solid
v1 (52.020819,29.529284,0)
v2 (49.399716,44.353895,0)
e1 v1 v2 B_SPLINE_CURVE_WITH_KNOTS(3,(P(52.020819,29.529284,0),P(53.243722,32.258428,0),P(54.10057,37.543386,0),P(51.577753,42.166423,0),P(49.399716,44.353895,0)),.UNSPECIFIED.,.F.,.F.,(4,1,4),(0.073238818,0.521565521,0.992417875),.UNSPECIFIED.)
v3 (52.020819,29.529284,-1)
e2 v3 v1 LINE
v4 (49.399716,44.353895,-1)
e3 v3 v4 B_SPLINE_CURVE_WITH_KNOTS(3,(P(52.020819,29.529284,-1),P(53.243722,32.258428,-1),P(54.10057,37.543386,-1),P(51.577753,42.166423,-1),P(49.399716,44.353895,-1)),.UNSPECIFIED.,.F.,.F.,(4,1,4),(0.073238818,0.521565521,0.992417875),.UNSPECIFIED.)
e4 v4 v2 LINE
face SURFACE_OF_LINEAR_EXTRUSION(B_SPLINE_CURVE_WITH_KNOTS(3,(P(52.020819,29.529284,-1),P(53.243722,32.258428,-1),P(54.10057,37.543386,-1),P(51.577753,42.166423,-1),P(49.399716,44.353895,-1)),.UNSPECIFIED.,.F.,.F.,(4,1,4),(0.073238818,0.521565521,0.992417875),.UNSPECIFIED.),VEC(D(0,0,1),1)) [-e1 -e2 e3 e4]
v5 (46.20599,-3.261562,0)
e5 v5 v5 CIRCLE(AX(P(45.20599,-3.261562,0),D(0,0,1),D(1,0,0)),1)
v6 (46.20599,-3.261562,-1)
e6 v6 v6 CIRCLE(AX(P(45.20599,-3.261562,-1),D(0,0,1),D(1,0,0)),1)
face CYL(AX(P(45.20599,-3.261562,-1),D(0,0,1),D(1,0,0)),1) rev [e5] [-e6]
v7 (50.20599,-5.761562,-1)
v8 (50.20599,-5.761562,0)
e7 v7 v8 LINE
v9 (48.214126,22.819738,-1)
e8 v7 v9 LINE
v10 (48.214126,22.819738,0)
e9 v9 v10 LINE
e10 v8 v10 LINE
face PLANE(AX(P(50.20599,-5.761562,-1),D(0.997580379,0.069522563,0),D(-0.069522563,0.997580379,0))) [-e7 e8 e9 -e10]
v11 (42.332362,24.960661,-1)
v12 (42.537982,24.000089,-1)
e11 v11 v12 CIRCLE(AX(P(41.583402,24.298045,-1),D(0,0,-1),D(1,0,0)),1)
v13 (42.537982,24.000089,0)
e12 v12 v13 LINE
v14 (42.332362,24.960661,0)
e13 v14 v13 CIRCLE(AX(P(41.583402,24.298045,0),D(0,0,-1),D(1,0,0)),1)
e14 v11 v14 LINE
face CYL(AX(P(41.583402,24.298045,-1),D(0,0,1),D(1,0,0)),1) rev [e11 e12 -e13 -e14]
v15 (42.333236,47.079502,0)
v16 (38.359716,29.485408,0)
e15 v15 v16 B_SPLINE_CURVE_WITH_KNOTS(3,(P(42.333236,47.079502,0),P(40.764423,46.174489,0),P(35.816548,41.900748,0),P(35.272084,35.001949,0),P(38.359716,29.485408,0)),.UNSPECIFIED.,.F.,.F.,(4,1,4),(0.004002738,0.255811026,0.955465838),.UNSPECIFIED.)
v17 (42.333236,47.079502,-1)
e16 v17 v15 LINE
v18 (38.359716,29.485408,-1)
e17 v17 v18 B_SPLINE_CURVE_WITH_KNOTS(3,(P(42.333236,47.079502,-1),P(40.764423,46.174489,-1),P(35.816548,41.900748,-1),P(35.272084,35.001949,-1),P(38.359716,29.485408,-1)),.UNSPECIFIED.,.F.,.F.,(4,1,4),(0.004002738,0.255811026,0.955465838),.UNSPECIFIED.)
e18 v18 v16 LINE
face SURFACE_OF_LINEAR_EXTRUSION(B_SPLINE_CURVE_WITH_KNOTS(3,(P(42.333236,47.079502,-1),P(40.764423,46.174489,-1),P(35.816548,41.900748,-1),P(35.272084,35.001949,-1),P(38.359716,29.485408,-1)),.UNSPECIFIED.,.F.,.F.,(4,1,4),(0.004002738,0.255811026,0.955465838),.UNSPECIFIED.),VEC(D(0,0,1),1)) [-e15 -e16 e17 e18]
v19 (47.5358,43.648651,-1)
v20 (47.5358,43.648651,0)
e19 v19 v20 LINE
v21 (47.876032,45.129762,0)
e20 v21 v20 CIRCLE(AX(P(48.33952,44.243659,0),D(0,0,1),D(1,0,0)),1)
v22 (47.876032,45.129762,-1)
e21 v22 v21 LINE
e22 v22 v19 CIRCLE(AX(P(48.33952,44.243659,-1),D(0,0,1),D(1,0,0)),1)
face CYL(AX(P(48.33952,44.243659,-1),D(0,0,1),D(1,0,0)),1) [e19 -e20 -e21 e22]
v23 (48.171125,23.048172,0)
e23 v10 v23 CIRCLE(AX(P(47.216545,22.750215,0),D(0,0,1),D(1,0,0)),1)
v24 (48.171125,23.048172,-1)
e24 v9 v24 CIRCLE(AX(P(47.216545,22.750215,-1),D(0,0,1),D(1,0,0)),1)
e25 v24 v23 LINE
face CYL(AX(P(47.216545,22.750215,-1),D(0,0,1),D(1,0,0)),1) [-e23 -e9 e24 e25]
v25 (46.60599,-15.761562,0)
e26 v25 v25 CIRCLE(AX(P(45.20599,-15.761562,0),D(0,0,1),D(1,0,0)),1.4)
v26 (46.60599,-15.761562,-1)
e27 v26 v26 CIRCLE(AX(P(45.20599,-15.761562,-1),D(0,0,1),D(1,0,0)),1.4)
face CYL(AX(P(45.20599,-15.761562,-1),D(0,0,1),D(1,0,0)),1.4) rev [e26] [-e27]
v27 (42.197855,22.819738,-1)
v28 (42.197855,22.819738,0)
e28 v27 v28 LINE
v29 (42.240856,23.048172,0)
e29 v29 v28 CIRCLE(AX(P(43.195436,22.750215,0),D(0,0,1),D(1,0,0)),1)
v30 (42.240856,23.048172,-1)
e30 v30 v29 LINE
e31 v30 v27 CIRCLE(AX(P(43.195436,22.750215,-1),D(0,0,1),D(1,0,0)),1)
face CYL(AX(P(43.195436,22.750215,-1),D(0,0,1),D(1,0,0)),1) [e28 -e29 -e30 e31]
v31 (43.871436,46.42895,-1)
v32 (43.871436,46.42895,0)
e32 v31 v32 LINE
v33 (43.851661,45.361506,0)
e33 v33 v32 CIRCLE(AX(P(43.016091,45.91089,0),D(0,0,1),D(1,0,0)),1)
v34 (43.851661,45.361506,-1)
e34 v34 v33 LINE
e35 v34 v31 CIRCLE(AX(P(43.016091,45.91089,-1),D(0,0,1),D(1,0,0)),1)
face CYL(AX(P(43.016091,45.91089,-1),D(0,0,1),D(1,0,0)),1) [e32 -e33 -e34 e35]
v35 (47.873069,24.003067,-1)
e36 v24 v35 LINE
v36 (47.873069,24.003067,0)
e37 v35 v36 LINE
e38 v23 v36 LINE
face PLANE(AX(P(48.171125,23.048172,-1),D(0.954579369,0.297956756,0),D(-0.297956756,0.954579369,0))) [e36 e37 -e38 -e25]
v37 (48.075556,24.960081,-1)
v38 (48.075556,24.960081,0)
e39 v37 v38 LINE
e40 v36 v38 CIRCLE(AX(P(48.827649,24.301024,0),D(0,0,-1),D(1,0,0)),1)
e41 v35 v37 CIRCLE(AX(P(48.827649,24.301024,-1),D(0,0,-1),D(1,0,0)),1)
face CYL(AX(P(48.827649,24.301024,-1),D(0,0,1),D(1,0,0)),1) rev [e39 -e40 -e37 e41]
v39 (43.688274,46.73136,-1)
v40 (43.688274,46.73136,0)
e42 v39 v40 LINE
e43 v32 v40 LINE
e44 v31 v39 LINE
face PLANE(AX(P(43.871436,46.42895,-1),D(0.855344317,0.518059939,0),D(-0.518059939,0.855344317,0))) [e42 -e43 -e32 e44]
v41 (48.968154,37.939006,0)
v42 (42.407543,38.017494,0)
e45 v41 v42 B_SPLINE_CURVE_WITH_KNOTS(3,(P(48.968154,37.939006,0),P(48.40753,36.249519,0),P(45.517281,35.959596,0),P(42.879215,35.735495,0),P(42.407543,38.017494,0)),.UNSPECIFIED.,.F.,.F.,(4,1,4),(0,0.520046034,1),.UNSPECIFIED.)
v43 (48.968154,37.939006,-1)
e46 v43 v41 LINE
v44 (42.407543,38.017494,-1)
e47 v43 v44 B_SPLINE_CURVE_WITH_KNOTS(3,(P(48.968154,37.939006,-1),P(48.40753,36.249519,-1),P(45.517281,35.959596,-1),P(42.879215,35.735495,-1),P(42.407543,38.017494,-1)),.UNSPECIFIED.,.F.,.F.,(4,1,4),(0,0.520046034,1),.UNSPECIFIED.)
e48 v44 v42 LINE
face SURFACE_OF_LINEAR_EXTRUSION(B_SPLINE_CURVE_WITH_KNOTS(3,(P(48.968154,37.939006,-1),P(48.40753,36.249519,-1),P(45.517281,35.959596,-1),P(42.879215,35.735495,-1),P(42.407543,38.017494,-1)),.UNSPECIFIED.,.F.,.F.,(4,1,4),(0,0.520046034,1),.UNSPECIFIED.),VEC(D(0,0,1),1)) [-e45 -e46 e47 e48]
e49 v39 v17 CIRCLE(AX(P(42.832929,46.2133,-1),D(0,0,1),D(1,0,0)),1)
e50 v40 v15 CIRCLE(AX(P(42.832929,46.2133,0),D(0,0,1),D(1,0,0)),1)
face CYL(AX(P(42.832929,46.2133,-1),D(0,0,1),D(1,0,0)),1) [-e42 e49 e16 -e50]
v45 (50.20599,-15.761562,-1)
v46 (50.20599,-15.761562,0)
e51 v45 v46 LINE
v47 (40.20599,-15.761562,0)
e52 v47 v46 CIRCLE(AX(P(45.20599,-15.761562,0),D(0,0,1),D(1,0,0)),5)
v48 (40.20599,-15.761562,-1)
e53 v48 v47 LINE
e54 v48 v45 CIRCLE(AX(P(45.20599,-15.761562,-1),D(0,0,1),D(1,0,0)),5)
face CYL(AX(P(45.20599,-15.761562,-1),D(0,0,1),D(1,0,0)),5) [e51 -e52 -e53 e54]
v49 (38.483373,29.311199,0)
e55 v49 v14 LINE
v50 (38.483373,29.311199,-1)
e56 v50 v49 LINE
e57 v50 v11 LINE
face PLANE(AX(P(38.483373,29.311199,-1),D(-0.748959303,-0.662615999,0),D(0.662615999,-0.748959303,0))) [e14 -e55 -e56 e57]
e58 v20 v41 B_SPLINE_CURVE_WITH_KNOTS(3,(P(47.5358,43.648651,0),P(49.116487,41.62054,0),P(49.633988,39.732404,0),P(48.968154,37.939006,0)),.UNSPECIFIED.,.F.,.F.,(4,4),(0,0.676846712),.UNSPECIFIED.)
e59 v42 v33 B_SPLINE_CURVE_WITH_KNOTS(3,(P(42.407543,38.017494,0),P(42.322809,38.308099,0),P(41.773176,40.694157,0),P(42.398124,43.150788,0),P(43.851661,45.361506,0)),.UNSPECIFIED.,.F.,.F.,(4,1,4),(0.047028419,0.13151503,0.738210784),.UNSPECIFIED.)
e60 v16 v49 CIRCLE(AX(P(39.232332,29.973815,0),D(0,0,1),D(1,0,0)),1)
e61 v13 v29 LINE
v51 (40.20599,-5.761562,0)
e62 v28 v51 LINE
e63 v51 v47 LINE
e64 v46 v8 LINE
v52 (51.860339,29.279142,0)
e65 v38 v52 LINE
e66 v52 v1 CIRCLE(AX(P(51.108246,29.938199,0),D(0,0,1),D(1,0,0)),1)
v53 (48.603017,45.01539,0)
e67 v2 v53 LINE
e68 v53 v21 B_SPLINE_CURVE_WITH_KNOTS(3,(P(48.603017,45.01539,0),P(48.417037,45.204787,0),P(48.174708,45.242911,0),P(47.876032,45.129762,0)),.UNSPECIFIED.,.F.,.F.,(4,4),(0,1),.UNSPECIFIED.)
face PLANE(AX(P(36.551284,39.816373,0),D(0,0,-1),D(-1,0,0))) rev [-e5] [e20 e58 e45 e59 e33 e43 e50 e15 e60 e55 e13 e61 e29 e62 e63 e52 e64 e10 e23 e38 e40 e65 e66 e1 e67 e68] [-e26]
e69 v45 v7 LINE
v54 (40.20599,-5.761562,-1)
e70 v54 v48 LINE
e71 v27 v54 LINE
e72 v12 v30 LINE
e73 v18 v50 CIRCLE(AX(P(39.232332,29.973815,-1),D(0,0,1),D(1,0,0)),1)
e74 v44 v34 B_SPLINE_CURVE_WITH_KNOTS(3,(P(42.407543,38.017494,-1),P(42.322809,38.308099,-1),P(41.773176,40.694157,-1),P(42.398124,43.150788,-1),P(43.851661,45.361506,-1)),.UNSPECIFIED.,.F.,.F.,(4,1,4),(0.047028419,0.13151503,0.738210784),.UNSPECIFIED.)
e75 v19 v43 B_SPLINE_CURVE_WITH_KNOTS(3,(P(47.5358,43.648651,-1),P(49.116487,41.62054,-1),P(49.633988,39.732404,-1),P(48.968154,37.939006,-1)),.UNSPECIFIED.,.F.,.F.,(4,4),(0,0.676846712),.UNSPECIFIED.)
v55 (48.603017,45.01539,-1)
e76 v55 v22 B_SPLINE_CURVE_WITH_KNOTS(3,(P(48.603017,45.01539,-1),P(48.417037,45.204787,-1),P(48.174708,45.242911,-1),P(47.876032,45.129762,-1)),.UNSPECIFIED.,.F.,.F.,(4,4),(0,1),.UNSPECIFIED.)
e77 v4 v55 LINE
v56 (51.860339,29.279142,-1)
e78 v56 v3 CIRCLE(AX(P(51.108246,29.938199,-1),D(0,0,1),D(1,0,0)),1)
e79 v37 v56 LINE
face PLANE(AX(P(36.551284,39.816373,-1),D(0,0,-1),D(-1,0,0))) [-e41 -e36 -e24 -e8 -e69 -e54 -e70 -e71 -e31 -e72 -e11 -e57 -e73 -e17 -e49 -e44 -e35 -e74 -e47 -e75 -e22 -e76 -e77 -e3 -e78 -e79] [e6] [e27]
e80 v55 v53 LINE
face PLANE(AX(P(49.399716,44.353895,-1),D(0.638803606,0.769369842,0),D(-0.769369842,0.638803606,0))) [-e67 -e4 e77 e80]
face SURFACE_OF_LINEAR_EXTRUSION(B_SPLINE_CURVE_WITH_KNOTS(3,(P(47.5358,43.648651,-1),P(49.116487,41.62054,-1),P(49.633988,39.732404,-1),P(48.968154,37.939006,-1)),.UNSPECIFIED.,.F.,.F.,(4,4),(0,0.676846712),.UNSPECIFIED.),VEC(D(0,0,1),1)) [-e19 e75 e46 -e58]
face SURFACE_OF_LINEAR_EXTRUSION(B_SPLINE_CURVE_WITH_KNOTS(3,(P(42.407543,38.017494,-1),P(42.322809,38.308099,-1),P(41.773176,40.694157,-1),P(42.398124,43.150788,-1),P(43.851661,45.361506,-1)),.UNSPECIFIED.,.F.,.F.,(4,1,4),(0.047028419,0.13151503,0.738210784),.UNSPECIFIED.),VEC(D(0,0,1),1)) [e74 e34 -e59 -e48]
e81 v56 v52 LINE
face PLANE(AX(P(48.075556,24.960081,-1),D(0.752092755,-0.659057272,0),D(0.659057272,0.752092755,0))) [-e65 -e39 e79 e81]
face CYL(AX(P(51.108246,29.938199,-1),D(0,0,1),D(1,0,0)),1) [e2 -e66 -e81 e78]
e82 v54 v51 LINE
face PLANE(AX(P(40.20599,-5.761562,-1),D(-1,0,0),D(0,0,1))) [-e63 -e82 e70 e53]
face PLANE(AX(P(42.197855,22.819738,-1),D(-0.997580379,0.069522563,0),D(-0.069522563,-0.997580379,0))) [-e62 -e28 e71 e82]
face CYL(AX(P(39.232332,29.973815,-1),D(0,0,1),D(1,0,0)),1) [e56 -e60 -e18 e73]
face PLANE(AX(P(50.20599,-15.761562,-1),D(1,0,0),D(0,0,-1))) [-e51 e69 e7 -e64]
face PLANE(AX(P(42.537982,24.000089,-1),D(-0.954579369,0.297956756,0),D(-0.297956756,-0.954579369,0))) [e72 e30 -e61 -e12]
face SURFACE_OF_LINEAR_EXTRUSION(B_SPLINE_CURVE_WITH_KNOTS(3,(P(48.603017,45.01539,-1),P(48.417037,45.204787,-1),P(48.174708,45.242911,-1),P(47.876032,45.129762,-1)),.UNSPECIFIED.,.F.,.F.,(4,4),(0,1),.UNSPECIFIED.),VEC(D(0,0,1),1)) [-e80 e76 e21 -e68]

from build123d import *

# Parameters (mm, degrees)
MODEL_R           = 1.4
MODEL_R_2         = 1
BRIDA_BASE1_DEPTH = 1


# Sheet-metal steps are written as plain solids
with BuildPart() as part:
    # Model → Brida base1 (new body)
    with BuildSketch(Plane.XY):
        with BuildLine():
            Line((43.871435578, 46.428949543), (43.688273589, 46.731359657))
            ThreePointArc((43.688273589, 46.731359657), (43.081772243, 47.181843562), (42.333236398, 47.079502368))
            add(Edge.make_bspline(
                [(42.333236398, 47.079502368), (40.764422927, 46.174489073), (35.816548406, 41.900747821), (35.272083644, 35.001949339), (38.359716274, 29.485408266)],
                knots=[0.004002738, 0.004002738, 0.004002738, 0.004002738, 0.255811026, 0.955465838, 0.955465838, 0.955465838, 0.955465838], degree=3))
            ThreePointArc((38.359716274, 29.485408266), (38.416879113, 29.394992141), (38.483372908, 29.311199296))
            Line((38.483372908, 29.311199296), (42.332361737, 24.960661438))
            ThreePointArc((42.332361737, 24.960661438), (42.561250074, 24.507363364), (42.537981803, 24.000088683))
            Line((42.537981803, 24.000088683), (42.240856149, 23.048171958))
            ThreePointArc((42.240856149, 23.048171958), (42.212695742, 22.935208537), (42.197855138, 22.819737764))
            Line((42.197855138, 22.819737764), (40.2059904, -5.7615616))
            Line((40.2059904, -5.7615616), (40.2059904, -15.7615616))
            ThreePointArc((40.2059904, -15.7615616), (45.2059904, -20.7615616), (50.2059904, -15.7615616))
            Line((50.2059904, -15.7615616), (50.2059904, -5.7615616))
            Line((50.2059904, -5.7615616), (48.214125662, 22.819737764))
            ThreePointArc((48.214125662, 22.819737764), (48.199285058, 22.935208537), (48.171124651, 23.048171958))
            Line((48.171124651, 23.048171958), (47.873069238, 24.0030674))
            ThreePointArc((47.873069238, 24.0030674), (47.849307461, 24.508023196), (48.075555852, 24.960081428))
            Line((48.075555852, 24.960081428), (51.860338986, 29.27914154))
            ThreePointArc((51.860338986, 29.27914154), (51.94992334, 29.398217661), (52.020818692, 29.529283781))
            add(Edge.make_bspline(
                [(52.020818692, 29.529283781), (53.24372236, 32.258428286), (54.100570293, 37.543385576), (51.577752865, 42.166423069), (49.399716108, 44.353895199)],
                knots=[0.073238818, 0.073238818, 0.073238818, 0.073238818, 0.521565521, 0.992417875, 0.992417875, 0.992417875, 0.992417875], degree=3))
            Line((49.399716108, 44.353895199), (48.603017078, 45.015390082))
            add(Edge.make_bspline(
                [(48.603017078, 45.015390082), (48.417036758, 45.204787232), (48.174708276, 45.242911079), (47.876031632, 45.129761621)],
                knots=[0, 0, 0, 0, 1, 1, 1, 1], degree=3))
            ThreePointArc((47.876031632, 45.129761621), (47.364904102, 44.467541566), (47.535799978, 43.648651249))
            add(Edge.make_bspline(
                [(47.535799978, 43.648651249), (49.116486798, 41.620539936), (49.633988071, 39.732404237), (48.968154199, 37.939006155)],
                knots=[0, 0, 0, 0, 0.676846712, 0.676846712, 0.676846712, 0.676846712], degree=3))
            add(Edge.make_bspline(
                [(48.968154199, 37.939006155), (48.407530031, 36.24951926), (45.517280844, 35.959596441), (42.879215477, 35.735494746), (42.407543293, 38.017493531)],
                knots=[0, 0, 0, 0, 0.520046034, 1, 1, 1, 1], degree=3))
            add(Edge.make_bspline(
                [(42.407543293, 38.017493531), (42.322809158, 38.308098707), (41.773176484, 40.694157088), (42.398123884, 43.150787581), (43.851661443, 45.361505885)],
                knots=[0.047028419, 0.047028419, 0.047028419, 0.047028419, 0.13151503, 0.738210784, 0.738210784, 0.738210784, 0.738210784], degree=3))
            ThreePointArc((43.851661443, 45.361505885), (44.015919722, 45.892368025), (43.871435578, 46.428949543))
        make_face()
        with Locations((45.2059904, -15.7615616)):
            Circle(MODEL_R, mode=Mode.SUBTRACT)
        with Locations((45.2059904, -3.2615616)):
            Circle(MODEL_R_2, mode=Mode.SUBTRACT)
    extrude(amount=-BRIDA_BASE1_DEPTH)


solid = part.part
